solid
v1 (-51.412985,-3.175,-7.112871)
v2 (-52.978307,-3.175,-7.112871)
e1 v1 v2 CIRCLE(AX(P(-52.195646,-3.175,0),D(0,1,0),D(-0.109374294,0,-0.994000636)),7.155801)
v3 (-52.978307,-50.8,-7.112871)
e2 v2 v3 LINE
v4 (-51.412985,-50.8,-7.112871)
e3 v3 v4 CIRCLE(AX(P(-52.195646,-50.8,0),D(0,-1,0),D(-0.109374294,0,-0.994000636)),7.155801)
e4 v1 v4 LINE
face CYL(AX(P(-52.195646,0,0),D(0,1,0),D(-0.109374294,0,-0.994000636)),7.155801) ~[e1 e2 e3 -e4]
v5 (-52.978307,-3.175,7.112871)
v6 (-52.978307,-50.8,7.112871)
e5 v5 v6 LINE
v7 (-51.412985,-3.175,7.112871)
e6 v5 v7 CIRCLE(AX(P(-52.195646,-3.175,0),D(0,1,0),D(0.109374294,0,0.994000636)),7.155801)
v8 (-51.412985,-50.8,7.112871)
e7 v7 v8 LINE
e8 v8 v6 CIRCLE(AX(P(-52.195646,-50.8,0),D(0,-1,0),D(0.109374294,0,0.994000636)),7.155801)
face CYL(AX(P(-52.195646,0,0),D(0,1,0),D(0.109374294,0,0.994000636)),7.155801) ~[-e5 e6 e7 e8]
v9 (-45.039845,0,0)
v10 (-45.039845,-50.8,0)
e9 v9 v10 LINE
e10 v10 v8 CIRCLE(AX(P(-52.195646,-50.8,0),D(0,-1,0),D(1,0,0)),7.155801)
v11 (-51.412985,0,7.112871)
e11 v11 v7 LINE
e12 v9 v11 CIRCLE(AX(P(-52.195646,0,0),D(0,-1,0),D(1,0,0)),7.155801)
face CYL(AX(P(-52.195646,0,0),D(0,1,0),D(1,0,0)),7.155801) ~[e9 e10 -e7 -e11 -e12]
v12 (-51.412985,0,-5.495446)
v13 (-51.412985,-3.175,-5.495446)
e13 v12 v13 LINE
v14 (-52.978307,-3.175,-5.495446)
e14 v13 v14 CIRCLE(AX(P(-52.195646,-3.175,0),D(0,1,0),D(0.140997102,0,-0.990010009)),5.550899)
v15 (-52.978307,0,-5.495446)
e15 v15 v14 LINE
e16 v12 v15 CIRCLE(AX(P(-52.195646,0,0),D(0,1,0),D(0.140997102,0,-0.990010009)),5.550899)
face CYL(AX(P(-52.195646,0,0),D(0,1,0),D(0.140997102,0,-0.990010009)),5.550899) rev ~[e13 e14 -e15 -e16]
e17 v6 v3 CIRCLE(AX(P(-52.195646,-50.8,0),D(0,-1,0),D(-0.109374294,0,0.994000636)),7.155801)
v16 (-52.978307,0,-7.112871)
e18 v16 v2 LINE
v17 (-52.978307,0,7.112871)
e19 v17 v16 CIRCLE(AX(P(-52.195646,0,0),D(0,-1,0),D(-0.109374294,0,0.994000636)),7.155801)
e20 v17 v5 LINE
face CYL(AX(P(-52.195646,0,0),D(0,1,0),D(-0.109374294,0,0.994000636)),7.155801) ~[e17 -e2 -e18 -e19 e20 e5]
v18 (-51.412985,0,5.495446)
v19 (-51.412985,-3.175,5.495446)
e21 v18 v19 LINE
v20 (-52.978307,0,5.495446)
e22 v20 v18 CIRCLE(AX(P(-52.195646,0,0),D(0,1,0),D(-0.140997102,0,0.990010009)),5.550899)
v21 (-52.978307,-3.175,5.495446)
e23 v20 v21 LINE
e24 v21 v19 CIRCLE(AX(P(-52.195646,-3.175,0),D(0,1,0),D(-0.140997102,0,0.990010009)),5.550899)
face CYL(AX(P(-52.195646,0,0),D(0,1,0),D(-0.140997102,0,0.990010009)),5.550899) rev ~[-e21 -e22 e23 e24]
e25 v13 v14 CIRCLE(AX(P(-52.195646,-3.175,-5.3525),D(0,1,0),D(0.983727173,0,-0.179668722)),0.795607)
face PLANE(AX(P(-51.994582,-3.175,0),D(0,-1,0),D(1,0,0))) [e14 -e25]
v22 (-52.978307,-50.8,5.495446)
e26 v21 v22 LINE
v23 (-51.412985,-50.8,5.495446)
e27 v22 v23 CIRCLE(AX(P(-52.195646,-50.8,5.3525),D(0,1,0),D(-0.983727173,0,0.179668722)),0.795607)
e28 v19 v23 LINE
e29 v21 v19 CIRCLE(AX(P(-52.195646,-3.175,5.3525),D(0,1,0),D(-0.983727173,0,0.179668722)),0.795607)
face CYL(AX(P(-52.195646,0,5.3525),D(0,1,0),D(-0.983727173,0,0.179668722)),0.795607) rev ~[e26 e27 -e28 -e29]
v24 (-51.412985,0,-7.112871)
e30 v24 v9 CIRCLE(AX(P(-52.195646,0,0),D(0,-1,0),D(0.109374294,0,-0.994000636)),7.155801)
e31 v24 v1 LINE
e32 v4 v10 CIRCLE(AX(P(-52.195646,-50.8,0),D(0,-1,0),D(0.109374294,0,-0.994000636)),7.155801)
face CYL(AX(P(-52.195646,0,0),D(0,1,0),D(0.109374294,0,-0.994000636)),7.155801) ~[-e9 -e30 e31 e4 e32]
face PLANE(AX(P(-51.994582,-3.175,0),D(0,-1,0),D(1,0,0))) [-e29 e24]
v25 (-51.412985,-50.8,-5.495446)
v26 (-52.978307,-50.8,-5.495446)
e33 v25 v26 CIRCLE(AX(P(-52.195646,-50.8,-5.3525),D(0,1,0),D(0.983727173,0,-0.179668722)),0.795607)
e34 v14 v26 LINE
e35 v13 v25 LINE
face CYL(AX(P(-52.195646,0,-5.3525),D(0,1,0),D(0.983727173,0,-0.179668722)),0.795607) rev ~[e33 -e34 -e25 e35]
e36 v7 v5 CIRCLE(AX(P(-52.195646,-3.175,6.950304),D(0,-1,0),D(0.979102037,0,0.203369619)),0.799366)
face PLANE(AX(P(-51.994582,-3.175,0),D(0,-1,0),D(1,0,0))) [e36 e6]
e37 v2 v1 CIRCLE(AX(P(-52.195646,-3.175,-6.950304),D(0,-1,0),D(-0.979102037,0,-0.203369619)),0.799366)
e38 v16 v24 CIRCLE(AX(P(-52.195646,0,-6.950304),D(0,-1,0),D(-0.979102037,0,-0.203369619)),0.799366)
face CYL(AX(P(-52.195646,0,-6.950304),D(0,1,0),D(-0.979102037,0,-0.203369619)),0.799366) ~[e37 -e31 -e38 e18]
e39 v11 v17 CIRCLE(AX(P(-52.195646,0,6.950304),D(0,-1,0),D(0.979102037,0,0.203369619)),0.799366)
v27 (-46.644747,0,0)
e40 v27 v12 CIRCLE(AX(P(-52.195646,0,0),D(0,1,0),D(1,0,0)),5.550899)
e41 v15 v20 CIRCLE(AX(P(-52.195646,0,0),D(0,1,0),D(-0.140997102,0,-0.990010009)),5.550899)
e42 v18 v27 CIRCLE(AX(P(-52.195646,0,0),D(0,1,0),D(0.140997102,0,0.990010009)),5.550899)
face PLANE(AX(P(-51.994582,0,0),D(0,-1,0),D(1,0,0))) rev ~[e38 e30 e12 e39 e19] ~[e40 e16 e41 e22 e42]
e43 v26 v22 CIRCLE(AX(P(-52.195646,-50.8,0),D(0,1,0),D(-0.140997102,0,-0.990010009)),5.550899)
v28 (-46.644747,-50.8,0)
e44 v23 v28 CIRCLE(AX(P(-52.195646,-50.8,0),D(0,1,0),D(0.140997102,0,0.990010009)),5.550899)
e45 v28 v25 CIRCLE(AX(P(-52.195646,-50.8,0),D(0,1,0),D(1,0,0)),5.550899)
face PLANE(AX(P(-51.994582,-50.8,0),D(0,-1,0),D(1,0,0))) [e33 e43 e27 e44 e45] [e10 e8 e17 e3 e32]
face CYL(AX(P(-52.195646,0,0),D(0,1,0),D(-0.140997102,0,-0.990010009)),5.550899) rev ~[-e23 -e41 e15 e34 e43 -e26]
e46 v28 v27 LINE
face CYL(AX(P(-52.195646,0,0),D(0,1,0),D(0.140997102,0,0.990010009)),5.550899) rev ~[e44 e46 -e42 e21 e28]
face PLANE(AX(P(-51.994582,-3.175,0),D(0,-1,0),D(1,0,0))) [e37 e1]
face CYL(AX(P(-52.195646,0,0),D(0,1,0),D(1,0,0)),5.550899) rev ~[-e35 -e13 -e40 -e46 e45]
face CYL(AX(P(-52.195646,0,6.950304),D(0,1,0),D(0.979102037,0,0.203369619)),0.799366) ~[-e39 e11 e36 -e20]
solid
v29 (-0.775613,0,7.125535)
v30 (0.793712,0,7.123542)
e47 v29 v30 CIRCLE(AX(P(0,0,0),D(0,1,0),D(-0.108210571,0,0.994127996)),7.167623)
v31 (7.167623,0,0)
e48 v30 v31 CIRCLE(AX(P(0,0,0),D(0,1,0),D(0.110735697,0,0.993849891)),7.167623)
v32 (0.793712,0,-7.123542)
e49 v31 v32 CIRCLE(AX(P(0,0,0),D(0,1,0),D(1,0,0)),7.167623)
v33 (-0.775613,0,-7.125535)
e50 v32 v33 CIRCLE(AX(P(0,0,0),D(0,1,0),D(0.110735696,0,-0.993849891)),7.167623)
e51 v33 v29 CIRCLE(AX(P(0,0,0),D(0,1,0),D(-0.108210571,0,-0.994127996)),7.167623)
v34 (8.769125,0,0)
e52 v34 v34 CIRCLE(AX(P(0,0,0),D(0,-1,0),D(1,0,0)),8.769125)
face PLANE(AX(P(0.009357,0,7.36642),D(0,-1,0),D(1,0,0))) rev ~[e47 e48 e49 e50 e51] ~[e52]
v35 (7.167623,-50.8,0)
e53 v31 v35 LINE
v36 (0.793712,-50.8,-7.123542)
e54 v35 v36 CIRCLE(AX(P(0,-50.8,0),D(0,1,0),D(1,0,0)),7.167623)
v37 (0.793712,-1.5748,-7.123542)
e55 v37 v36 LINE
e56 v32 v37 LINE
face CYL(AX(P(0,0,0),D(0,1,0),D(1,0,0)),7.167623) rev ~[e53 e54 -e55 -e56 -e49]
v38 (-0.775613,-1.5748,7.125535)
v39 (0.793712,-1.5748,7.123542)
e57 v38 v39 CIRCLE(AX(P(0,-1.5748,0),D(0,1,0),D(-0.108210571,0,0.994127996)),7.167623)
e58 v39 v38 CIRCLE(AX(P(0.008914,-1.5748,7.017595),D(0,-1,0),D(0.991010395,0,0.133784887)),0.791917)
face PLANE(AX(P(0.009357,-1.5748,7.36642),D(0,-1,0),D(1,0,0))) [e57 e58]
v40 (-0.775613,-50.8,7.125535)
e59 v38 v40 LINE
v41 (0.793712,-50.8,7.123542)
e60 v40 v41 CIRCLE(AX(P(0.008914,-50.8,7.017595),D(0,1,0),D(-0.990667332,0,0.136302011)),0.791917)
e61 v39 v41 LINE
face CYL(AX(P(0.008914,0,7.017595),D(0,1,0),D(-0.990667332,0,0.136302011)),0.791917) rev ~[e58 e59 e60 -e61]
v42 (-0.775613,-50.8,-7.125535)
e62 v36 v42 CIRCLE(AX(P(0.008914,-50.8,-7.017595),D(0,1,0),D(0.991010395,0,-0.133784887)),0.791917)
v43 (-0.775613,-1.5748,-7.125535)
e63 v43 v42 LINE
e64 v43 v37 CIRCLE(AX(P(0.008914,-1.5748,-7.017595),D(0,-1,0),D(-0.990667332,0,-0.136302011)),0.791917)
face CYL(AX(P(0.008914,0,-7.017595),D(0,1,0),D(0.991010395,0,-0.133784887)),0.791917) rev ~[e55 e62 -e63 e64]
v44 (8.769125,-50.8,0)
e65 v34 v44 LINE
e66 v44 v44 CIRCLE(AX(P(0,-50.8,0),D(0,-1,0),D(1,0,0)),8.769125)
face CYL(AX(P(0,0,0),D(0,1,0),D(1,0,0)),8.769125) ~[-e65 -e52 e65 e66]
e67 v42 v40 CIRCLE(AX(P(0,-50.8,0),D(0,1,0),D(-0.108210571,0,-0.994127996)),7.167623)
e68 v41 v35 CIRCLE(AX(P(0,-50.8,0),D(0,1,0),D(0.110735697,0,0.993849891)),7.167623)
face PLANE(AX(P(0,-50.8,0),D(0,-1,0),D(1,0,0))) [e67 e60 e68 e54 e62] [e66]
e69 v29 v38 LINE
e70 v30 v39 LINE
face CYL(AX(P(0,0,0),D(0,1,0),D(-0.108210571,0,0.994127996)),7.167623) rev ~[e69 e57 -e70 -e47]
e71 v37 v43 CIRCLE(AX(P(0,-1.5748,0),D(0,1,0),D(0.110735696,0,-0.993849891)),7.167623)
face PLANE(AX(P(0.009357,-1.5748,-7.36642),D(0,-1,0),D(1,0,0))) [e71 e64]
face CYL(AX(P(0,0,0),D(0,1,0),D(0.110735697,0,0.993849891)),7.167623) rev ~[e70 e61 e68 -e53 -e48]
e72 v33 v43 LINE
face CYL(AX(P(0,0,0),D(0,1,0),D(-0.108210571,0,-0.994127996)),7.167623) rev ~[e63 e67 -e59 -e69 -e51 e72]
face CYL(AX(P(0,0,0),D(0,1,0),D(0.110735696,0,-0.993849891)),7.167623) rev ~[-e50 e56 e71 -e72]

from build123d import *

# Parameters (mm, degrees)
F1_DEPTH = 50.8
F2_DEPTH = 3.175
F3_R     = 8.7691254342
F4_DEPTH = 50.8
F5_DEPTH = 1.5748


# Not quite as in the source:
# - a length typed as a fraction of an inch, garbled in the dataset ("3 / 203.2 mm" for 3/8 in), is restored
# - a feature names something its author has since deleted; it is built from what else it names


with BuildPart() as f1:
    # F0 (on Front) → F1 (new body)
    with BuildSketch(Plane.XZ):
        with BuildLine():
            ThreePointArc((-51.4129851972, -7.1128706299), (-46.8661970111, -4.7751922682), (-45.0398449824, 0))
            ThreePointArc((-45.0398449824, 0), (-46.8661970111, 4.7751922682), (-51.4129851972, 7.1128706299))
            ThreePointArc((-51.4129851972, 7.1128706299), (-52.1956458688, 7.1558008863), (-52.9783065404, 7.1128706299))
            ThreePointArc((-52.9783065404, 7.1128706299), (-59.3514467551, 0), (-52.9783065404, -7.1128706299))
            ThreePointArc((-52.9783065404, -7.1128706299), (-52.1956458688, -7.1558008863), (-51.4129851972, -7.1128706299))
        make_face()
        with BuildLine():
            ThreePointArc((-51.4129851972, 5.4954455624), (-48.0029766717, 3.6378571523), (-46.6447468735, 0))
            ThreePointArc((-46.6447468735, 0), (-48.0029766717, -3.6378571523), (-51.4129851972, -5.4954455624))
            ThreePointArc((-51.4129851972, -5.4954455624), (-52.1956458688, -6.1481072421), (-52.9783065404, -5.4954455624))
            ThreePointArc((-52.9783065404, -5.4954455624), (-57.7465448641, 0), (-52.9783065404, 5.4954455624))
            ThreePointArc((-52.9783065404, 5.4954455624), (-52.1956458688, 6.1481072421), (-51.4129851972, 5.4954455624))
        make_face(mode=Mode.SUBTRACT)
    extrude(amount=F1_DEPTH)

    # F0 (on Front) → F2 (join)
    with BuildSketch(Plane.XZ):
        with BuildLine():
            ThreePointArc((-51.4129851972, -7.1128706299), (-46.8661970111, -4.7751922682), (-45.0398449824, 0))
            ThreePointArc((-45.0398449824, 0), (-46.8661970111, 4.7751922682), (-51.4129851972, 7.1128706299))
            ThreePointArc((-51.4129851972, 7.1128706299), (-52.1956458688, 7.1558008863), (-52.9783065404, 7.1128706299))
            ThreePointArc((-52.9783065404, 7.1128706299), (-59.3514467551, 0), (-52.9783065404, -7.1128706299))
            ThreePointArc((-52.9783065404, -7.1128706299), (-52.1956458688, -7.1558008863), (-51.4129851972, -7.1128706299))
        make_face()
        with BuildLine():
            ThreePointArc((-51.4129851972, 5.4954455624), (-48.0029766717, 3.6378571523), (-46.6447468735, 0))
            ThreePointArc((-46.6447468735, 0), (-48.0029766717, -3.6378571523), (-51.4129851972, -5.4954455624))
            ThreePointArc((-51.4129851972, -5.4954455624), (-52.1956458688, -6.1481072421), (-52.9783065404, -5.4954455624))
            ThreePointArc((-52.9783065404, -5.4954455624), (-57.7465448641, 0), (-52.9783065404, 5.4954455624))
            ThreePointArc((-52.9783065404, 5.4954455624), (-52.1956458688, 6.1481072421), (-51.4129851972, 5.4954455624))
        make_face(mode=Mode.SUBTRACT)
        with BuildLine():
            ThreePointArc((-52.9783065404, 5.4954455624), (-52.1956458688, 5.5508989953), (-51.4129851972, 5.4954455624))
            ThreePointArc((-51.4129851972, 5.4954455624), (-52.1956458688, 6.1481072421), (-52.9783065404, 5.4954455624))
        make_face()
        with BuildLine():
            ThreePointArc((-52.9783065404, -5.4954455624), (-52.1956458688, -6.1481072421), (-51.4129851972, -5.4954455624))
            ThreePointArc((-51.4129851972, -5.4954455624), (-52.1956458688, -5.5508989953), (-52.9783065404, -5.4954455624))
        make_face()
        with BuildLine():
            ThreePointArc((-52.9783065404, 7.1128706299), (-52.1956458688, 7.1558008863), (-51.4129851972, 7.1128706299))
            ThreePointArc((-51.4129851972, 7.1128706299), (-52.1956458688, 7.7496697029), (-52.9783065404, 7.1128706299))
        make_face()
        with BuildLine():
            ThreePointArc((-52.9783065404, -7.1128706299), (-52.1956458688, -7.7496697029), (-51.4129851972, -7.1128706299))
            ThreePointArc((-51.4129851972, -7.1128706299), (-52.1956458688, -7.1558008863), (-52.9783065404, -7.1128706299))
        make_face()
    extrude(amount=F2_DEPTH)


with BuildPart() as f4:
    # F3 (on Front) → F4 (new body)
    with BuildSketch(Plane.XZ):
        Circle(F3_R)
        with BuildLine():
            ThreePointArc((0.793711748, 7.1235415414), (5.3415283007, 4.779424426), (7.1676232066, 0))
            ThreePointArc((7.1676232066, 0), (5.3415283007, -4.779424426), (0.793711748, -7.1235415414))
            ThreePointArc((0.793711748, -7.1235415414), (0.0099196257, -7.8095114052), (-0.7756125997, -7.1255348941))
            ThreePointArc((-0.7756125997, -7.1255348941), (-7.1676232066, 0), (-0.7756125997, 7.1255348941))
            ThreePointArc((-0.7756125997, 7.1255348941), (0.0099196257, 7.8095114052), (0.793711748, 7.1235415414))
        make_face(mode=Mode.SUBTRACT)
    extrude(amount=F4_DEPTH)

    # F3 (on Front) → F5 (join)
    with BuildSketch(Plane.XZ):
        with BuildLine():
            ThreePointArc((-0.7756125997, 7.1255348941), (0.0091042933, 7.1676174244), (0.793711748, 7.1235415414))
            ThreePointArc((0.793711748, 7.1235415414), (0.0099196257, 7.8095114052), (-0.7756125997, 7.1255348941))
        make_face()
        with BuildLine():
            ThreePointArc((-0.7756125997, -7.1255348941), (0.0099196257, -7.8095114052), (0.793711748, -7.1235415414))
            ThreePointArc((0.793711748, -7.1235415414), (0.0091042933, -7.1676174244), (-0.7756125997, -7.1255348941))
        make_face()
    extrude(amount=F5_DEPTH)


solid = Compound([f1.part, f4.part])
